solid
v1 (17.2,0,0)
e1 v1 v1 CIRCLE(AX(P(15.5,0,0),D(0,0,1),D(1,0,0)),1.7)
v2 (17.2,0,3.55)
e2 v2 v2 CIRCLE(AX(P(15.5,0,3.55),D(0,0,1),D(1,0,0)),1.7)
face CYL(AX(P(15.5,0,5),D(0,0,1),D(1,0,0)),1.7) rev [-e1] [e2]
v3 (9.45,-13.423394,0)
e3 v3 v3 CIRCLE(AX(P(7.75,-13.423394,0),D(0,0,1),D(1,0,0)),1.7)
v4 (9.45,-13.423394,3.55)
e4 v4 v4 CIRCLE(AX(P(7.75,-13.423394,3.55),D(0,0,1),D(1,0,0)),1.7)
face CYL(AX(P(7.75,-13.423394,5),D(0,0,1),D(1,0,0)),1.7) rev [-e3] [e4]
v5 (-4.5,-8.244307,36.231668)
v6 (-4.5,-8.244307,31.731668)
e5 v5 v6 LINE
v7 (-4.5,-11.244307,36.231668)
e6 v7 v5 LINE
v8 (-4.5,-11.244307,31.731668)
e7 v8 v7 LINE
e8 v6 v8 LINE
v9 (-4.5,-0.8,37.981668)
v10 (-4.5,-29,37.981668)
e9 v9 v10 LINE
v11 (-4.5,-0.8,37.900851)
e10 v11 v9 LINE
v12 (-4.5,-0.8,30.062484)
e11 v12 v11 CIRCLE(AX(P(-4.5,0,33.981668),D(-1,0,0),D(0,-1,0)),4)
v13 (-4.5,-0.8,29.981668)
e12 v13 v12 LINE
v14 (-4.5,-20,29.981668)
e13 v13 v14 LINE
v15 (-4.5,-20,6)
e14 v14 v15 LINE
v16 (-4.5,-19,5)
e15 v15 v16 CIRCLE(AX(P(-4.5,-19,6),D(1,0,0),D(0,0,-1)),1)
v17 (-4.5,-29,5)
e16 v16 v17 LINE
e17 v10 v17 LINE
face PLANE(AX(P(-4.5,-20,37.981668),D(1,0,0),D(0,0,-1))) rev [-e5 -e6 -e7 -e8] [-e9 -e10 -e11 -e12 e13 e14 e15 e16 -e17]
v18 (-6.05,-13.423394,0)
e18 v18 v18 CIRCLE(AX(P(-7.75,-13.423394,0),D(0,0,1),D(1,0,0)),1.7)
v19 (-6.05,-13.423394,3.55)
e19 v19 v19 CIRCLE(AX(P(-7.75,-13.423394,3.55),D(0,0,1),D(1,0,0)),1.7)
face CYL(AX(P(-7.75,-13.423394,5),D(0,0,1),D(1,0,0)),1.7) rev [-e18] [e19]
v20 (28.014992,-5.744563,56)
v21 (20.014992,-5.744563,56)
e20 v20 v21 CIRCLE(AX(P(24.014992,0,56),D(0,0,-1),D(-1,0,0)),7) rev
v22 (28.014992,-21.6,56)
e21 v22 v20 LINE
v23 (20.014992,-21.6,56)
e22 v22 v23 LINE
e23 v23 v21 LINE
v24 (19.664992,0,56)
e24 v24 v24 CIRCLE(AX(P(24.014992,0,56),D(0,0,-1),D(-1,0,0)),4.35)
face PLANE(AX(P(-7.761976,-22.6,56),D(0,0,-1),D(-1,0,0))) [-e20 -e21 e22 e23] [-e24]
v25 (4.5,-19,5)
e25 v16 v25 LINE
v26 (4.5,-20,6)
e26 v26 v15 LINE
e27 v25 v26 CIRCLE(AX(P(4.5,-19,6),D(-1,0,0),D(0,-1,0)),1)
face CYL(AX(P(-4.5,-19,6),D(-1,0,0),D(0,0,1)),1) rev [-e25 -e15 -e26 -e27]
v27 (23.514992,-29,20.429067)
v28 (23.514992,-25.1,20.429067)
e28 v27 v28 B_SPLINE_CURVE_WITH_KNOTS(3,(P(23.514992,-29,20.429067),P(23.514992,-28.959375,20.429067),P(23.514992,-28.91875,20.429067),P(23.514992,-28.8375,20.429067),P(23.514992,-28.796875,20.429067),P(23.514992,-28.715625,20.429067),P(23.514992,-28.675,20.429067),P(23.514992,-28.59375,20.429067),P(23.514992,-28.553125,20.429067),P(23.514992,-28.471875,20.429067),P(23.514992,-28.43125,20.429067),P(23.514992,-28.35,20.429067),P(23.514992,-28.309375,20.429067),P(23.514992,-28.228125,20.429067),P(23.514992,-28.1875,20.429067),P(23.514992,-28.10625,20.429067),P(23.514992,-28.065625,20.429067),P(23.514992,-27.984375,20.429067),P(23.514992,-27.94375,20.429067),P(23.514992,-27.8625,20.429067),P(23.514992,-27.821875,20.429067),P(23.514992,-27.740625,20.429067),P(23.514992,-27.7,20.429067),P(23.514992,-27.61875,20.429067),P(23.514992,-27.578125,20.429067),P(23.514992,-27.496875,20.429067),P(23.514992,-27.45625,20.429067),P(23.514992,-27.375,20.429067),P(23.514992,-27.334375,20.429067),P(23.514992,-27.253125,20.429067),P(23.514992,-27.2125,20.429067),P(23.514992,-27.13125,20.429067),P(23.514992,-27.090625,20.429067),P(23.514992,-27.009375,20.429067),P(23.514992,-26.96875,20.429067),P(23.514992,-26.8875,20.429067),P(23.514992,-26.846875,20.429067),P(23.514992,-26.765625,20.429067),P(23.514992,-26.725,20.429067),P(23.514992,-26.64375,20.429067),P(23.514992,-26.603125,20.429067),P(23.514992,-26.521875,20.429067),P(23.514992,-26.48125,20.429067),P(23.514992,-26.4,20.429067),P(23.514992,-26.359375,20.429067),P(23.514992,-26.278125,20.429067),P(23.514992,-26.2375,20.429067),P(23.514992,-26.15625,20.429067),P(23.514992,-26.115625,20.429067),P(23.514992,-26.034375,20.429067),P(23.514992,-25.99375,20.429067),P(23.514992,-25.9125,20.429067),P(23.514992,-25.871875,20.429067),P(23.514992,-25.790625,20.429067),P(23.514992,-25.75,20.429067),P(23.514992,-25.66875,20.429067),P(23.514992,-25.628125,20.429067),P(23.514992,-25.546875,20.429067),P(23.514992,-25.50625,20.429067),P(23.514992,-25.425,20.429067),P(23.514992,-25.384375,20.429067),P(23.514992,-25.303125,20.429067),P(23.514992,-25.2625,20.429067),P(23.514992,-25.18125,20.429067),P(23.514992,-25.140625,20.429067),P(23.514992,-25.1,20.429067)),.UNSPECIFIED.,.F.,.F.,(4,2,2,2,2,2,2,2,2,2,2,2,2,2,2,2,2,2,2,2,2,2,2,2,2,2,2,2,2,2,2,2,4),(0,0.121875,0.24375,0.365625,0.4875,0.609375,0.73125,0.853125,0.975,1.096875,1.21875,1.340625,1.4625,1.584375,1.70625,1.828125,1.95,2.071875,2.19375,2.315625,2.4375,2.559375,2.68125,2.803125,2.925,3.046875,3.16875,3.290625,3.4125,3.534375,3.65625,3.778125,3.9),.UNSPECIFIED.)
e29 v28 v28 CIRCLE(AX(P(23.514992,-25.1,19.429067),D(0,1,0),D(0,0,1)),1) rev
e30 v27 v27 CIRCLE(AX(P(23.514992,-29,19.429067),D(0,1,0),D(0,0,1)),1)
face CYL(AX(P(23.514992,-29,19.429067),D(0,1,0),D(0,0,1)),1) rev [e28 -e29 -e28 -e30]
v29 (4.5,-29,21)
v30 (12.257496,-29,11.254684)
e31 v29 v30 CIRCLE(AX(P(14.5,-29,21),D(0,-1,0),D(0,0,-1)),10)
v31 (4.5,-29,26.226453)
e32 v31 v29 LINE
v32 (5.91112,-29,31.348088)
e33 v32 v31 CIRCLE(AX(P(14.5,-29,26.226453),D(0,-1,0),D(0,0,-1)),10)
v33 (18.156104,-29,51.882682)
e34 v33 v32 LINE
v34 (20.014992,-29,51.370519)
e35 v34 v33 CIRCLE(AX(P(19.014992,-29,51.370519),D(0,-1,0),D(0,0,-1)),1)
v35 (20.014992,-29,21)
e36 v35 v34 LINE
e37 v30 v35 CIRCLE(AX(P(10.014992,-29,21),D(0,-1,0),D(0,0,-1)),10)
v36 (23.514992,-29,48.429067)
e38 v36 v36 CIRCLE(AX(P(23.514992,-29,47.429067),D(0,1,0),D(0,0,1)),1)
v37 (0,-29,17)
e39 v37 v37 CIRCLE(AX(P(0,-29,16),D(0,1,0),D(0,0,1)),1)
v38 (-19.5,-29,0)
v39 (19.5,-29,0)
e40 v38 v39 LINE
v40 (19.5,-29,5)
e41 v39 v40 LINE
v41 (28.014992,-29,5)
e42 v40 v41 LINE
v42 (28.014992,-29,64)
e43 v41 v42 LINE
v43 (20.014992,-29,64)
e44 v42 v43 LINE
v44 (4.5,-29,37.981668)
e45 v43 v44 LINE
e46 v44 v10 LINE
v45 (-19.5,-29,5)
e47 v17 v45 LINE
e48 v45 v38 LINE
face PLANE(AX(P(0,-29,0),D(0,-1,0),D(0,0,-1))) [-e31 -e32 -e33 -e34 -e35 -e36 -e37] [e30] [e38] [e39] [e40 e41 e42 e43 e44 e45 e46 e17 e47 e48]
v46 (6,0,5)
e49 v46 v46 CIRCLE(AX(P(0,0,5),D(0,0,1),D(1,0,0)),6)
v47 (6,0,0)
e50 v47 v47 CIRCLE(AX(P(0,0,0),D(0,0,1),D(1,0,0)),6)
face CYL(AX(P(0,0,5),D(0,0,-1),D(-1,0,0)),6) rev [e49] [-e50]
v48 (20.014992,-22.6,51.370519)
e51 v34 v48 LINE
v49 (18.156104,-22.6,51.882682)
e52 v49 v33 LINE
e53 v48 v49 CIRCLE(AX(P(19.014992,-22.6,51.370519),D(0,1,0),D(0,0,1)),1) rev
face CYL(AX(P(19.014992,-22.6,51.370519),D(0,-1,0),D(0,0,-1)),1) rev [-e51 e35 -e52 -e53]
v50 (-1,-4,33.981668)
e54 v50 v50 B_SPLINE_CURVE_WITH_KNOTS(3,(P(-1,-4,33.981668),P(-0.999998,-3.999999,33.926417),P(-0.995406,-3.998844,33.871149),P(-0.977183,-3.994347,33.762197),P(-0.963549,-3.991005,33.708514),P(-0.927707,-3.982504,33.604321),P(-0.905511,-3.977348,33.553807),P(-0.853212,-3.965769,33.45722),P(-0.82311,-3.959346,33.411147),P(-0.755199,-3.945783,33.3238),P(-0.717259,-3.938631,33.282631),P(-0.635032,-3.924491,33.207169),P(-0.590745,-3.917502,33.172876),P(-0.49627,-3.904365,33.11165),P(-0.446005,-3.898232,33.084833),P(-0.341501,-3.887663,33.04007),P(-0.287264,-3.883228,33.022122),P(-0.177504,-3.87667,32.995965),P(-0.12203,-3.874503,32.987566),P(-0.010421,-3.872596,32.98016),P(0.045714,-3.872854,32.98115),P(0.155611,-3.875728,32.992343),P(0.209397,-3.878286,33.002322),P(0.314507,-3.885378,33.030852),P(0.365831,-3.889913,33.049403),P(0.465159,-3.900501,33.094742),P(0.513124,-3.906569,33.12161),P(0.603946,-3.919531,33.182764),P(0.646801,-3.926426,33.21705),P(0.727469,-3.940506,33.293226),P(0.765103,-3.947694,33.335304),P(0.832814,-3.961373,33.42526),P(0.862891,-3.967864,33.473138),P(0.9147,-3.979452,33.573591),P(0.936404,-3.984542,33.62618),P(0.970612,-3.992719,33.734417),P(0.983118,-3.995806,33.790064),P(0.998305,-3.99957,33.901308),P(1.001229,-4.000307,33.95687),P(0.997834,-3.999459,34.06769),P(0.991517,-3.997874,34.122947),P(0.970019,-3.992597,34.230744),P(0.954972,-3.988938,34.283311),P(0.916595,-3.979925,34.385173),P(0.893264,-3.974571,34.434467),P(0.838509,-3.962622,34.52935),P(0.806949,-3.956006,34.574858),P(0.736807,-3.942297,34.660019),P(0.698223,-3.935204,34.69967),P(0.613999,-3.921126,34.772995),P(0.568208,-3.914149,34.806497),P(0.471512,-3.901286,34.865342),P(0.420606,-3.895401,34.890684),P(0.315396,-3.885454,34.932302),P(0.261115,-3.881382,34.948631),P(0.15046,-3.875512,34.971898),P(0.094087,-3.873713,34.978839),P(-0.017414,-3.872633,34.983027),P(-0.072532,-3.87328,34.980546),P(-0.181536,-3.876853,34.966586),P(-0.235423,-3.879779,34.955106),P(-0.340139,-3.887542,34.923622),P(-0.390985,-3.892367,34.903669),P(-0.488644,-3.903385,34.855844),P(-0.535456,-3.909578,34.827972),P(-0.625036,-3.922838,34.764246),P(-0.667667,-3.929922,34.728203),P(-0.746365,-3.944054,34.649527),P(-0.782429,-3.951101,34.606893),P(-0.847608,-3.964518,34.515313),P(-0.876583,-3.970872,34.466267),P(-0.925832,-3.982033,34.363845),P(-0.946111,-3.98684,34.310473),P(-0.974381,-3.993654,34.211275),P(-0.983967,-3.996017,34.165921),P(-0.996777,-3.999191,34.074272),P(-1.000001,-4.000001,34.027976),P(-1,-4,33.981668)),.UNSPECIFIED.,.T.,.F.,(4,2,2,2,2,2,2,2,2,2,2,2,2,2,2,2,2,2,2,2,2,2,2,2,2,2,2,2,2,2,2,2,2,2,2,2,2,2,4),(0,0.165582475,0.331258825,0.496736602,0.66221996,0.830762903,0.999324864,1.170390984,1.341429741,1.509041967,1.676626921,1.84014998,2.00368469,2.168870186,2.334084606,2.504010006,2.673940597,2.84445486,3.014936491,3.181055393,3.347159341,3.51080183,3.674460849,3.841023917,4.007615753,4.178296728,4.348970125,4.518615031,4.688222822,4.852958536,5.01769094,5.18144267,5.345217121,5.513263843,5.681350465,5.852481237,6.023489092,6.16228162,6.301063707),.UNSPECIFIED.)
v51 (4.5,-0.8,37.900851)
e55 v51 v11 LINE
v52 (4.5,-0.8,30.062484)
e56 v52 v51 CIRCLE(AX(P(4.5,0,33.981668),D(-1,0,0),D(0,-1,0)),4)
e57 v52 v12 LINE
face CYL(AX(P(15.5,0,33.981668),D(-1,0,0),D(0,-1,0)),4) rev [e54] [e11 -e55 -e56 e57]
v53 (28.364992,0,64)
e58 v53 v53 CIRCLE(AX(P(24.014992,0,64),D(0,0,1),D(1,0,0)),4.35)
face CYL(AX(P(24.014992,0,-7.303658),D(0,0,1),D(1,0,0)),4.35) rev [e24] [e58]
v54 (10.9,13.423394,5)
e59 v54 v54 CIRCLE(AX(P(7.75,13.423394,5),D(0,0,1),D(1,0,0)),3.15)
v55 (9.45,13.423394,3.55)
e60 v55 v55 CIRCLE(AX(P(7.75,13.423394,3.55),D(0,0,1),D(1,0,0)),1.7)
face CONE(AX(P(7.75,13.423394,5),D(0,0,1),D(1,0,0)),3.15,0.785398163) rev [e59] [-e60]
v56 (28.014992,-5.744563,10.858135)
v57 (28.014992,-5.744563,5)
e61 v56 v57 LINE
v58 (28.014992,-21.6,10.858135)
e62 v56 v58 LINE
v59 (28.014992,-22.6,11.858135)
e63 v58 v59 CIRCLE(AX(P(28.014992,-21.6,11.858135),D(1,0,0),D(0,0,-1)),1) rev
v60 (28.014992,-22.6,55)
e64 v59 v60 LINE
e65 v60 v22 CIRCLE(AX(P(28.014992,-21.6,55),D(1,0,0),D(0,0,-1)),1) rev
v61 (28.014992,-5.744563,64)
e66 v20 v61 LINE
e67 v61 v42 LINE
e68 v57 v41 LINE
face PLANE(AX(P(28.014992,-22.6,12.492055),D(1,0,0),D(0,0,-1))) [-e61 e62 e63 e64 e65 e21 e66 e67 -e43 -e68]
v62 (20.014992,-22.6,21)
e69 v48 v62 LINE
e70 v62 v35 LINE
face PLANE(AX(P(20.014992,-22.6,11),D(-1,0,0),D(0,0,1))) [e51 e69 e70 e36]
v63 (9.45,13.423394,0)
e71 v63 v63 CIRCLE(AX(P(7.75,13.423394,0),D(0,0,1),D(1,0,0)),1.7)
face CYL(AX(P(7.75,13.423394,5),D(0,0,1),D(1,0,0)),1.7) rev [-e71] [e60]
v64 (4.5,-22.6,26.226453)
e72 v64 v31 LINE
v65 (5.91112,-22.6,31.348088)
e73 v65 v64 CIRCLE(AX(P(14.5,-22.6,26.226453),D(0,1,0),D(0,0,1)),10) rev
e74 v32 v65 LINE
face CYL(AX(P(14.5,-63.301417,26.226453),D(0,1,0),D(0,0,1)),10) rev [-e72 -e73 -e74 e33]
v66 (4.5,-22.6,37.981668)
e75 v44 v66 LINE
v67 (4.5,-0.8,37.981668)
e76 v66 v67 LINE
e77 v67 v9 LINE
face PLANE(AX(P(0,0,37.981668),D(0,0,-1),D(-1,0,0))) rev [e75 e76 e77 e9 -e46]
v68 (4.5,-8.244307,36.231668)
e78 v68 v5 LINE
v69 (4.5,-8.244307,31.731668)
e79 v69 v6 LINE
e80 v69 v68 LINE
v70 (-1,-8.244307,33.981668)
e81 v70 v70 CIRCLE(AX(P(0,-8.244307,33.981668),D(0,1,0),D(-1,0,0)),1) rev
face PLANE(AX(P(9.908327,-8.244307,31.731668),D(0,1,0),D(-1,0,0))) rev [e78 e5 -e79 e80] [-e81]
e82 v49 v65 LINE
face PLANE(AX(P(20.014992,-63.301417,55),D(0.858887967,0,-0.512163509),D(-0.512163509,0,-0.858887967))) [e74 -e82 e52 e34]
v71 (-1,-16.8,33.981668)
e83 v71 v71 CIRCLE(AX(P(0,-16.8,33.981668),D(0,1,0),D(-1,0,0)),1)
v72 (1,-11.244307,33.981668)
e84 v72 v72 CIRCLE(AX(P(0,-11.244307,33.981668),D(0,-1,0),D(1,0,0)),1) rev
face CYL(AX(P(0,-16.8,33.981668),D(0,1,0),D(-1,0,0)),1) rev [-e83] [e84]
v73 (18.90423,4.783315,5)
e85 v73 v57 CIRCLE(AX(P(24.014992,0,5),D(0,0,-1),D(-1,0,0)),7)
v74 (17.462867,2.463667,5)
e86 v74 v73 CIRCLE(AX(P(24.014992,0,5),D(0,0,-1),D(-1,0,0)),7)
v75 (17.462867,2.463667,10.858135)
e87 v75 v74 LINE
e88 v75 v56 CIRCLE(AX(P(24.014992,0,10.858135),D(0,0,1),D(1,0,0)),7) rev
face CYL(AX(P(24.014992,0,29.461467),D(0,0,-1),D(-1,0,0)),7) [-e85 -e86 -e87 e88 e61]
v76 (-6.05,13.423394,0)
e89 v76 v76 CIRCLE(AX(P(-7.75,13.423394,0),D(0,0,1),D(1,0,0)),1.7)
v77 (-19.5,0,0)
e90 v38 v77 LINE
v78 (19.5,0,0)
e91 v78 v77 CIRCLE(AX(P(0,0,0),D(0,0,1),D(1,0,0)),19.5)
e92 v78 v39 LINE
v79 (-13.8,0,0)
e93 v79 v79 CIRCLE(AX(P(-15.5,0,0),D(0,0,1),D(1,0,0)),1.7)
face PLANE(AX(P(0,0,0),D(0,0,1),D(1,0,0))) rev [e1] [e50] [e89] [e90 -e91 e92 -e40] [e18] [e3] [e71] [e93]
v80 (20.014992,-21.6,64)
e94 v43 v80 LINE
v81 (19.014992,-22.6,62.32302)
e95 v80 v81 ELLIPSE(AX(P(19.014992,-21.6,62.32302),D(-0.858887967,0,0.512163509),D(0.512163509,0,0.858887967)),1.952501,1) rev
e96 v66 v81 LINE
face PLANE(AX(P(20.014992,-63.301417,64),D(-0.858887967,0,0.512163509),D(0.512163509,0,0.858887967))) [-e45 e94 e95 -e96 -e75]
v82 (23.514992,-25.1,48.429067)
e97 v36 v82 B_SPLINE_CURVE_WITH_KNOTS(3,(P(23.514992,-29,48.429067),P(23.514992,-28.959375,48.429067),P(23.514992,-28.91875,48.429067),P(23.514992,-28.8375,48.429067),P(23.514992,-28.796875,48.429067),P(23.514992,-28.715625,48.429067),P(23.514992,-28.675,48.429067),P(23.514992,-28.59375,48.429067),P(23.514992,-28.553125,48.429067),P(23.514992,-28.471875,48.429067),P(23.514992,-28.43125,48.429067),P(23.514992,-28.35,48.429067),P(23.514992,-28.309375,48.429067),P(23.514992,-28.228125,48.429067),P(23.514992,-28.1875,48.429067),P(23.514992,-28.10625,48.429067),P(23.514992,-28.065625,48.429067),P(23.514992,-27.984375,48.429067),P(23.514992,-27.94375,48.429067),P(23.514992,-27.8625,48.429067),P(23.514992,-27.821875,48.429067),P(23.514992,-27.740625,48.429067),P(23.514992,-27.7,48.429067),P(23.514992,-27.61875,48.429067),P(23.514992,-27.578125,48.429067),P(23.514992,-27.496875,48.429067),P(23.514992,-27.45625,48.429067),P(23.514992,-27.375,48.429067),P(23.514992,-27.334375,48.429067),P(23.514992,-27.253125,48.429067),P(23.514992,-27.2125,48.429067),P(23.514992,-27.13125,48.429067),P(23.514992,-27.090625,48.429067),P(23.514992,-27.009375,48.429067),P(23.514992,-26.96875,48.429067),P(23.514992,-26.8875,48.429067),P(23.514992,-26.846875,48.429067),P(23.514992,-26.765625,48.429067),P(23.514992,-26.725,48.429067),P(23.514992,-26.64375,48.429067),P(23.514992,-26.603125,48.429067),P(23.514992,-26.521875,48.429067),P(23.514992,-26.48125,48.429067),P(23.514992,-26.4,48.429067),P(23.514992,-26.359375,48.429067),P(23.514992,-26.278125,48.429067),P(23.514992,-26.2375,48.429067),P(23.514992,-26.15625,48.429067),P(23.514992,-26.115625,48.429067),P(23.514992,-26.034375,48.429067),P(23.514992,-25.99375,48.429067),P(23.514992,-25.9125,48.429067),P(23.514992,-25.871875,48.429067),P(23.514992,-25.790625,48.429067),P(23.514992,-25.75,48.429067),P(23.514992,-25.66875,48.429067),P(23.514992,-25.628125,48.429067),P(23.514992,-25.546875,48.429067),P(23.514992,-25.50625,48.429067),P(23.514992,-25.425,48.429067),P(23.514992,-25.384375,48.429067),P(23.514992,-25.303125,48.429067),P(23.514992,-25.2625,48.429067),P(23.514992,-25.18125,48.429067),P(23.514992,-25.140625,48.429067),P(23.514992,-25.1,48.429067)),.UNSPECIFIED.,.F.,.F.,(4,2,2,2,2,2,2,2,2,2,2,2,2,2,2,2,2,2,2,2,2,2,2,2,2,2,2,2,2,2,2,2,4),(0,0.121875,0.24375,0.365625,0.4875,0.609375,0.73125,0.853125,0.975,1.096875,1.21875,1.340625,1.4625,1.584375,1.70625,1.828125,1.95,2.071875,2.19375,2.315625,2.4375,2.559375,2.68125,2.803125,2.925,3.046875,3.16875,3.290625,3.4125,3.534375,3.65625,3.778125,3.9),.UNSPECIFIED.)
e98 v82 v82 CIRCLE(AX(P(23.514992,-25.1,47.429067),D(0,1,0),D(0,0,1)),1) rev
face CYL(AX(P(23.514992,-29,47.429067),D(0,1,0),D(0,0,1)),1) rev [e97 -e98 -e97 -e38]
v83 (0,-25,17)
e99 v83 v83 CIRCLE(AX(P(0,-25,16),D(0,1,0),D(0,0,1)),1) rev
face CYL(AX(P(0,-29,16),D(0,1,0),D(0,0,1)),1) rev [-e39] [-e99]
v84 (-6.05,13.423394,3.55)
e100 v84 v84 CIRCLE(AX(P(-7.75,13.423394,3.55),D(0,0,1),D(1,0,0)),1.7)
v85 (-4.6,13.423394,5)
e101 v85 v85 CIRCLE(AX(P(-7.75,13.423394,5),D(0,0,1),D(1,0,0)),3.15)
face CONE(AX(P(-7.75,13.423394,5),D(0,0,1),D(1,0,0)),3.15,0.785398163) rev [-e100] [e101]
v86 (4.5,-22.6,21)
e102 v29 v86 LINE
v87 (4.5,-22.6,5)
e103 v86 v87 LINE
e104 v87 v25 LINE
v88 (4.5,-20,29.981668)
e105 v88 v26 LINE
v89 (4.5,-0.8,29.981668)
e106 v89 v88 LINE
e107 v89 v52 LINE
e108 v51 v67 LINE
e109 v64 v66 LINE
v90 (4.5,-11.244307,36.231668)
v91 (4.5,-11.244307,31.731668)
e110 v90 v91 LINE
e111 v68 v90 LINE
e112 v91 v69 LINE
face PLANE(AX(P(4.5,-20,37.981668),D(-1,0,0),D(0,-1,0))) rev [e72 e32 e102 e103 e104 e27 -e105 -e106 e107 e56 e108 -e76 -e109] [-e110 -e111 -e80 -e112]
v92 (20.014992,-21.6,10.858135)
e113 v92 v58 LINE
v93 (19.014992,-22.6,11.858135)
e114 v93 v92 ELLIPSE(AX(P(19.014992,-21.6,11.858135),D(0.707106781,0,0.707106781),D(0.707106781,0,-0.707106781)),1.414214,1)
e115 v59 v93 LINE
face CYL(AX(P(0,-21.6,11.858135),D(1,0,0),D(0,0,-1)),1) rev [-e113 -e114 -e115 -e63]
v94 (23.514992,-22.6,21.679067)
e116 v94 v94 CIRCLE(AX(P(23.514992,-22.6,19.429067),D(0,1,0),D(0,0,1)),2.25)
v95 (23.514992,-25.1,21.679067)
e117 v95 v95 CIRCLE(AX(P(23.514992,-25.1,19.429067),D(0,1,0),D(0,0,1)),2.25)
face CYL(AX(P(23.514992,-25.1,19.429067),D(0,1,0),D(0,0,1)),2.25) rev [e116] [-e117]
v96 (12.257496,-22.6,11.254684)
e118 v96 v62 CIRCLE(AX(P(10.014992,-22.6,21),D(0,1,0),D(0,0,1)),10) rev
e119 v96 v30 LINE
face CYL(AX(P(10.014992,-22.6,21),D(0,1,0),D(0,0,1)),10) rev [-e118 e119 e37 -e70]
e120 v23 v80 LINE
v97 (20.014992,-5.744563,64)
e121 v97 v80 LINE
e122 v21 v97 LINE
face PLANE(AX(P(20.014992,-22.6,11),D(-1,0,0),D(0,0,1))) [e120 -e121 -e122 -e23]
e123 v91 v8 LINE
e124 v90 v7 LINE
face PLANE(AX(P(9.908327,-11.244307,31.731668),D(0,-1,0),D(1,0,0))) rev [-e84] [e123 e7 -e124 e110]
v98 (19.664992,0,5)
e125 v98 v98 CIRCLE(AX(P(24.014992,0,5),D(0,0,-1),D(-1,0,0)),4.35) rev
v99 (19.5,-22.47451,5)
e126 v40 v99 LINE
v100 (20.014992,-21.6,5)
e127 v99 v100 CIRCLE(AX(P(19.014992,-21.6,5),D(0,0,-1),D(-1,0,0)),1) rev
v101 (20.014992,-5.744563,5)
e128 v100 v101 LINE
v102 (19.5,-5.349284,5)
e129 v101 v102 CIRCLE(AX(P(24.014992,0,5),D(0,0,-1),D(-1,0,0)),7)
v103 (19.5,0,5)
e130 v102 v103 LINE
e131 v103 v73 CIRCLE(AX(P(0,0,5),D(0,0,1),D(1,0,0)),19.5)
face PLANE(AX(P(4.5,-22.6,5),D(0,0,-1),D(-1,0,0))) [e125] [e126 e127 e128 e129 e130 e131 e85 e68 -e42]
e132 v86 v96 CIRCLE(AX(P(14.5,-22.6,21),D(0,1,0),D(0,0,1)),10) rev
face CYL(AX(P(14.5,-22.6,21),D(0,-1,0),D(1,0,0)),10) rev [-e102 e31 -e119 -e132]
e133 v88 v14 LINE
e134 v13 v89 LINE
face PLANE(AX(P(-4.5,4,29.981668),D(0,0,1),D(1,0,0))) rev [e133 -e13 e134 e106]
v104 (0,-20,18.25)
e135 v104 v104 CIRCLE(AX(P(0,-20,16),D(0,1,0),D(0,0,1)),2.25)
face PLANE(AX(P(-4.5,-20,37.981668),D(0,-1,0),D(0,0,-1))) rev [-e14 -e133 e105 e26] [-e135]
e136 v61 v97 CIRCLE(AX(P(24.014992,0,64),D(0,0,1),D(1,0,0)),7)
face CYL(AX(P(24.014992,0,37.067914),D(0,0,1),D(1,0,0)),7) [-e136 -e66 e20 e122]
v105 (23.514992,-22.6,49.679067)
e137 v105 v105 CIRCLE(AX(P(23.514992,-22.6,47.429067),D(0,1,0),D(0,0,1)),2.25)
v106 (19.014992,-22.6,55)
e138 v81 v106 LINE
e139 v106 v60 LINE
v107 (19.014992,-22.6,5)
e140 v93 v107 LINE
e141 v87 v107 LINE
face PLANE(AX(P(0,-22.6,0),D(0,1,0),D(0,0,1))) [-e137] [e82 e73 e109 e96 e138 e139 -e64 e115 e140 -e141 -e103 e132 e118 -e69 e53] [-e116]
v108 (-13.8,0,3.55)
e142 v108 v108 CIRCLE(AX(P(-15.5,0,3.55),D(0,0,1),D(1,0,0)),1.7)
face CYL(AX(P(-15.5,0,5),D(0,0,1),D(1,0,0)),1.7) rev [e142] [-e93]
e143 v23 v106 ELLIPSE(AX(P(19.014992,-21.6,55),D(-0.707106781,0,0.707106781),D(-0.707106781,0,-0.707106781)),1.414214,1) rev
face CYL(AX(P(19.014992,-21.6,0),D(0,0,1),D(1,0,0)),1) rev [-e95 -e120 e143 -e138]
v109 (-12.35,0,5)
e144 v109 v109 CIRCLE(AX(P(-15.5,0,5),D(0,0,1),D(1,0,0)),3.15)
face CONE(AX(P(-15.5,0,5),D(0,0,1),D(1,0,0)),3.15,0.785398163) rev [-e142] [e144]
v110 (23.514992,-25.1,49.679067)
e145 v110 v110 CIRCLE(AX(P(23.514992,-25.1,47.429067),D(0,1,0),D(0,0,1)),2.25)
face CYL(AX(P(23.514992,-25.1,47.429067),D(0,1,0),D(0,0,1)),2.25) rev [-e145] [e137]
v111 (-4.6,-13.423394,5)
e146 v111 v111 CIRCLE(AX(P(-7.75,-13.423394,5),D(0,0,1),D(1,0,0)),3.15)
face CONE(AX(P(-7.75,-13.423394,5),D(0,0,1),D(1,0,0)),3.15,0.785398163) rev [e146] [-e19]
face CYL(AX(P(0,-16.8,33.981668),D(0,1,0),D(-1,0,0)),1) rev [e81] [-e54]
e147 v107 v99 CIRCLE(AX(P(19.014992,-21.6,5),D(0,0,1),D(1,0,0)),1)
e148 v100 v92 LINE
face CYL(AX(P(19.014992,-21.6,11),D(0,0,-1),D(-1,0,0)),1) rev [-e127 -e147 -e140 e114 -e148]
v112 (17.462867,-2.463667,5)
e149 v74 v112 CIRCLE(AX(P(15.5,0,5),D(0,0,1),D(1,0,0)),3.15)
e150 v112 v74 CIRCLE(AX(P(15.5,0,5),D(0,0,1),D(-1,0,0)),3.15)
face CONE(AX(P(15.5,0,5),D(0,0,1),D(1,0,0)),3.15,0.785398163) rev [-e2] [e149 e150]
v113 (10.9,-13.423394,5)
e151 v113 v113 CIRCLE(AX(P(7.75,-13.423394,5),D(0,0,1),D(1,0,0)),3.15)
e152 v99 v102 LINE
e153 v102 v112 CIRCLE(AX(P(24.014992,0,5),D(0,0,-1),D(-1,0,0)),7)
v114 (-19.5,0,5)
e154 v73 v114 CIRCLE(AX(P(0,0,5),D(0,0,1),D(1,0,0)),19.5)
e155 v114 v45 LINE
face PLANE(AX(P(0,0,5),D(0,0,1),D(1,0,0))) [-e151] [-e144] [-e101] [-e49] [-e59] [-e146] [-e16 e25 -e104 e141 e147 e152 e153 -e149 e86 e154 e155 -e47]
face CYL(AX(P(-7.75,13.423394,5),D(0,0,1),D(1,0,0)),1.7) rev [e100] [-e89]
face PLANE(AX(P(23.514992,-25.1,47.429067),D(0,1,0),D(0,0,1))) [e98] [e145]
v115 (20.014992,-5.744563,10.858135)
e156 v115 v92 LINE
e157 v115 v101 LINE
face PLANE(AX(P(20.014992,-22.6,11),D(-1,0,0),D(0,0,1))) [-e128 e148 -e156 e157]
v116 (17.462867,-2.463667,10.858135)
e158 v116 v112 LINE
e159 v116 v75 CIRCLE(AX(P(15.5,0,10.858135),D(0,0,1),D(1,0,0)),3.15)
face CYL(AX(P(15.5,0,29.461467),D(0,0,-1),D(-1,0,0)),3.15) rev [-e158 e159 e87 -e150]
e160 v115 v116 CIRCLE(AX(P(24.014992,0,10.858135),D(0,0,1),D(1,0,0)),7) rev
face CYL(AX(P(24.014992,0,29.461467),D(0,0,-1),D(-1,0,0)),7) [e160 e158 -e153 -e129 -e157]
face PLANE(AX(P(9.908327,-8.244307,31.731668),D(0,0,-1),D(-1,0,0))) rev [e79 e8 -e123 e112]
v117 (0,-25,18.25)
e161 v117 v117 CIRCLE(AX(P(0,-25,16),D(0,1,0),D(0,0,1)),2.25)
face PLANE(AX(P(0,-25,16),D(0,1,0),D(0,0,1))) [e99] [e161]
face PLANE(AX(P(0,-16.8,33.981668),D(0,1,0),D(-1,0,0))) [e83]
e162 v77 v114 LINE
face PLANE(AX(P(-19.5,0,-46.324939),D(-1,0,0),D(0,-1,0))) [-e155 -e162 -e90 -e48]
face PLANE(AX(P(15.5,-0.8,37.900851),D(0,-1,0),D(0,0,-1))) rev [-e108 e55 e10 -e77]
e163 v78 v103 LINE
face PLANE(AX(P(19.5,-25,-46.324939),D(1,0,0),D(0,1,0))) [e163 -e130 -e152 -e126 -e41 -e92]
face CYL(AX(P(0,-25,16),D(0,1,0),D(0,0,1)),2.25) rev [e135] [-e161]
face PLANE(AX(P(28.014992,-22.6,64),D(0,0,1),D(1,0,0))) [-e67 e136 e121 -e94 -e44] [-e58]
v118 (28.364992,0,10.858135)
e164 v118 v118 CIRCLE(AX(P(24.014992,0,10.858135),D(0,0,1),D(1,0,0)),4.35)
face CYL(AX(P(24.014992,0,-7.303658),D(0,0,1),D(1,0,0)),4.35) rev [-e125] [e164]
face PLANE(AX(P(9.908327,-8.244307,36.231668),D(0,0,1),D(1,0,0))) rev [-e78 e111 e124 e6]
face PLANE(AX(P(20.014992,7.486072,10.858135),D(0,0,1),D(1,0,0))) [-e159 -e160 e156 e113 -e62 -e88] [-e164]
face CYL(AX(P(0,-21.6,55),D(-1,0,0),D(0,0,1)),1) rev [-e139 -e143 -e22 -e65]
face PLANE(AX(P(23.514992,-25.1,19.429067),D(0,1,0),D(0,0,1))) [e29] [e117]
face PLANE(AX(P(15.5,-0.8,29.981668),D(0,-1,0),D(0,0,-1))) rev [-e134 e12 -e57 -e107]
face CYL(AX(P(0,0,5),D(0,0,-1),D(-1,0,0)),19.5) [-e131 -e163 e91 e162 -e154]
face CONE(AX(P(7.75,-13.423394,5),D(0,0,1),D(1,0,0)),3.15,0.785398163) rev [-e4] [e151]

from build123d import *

# Parameters (mm, degrees)
SKETCH5_R                                       = 19.5
SKETCH5_R_2                                     = 1.5
SKETCH5_R_3                                     = 6
BOSS_EXTRUDE1_DEPTH                             = 5
CSK_FOR_M3_FLAT_HEAD_MACHINE_SCREW1_D           = 3.4
CSK_FOR_M3_FLAT_HEAD_MACHINE_SCREW1_CSINK_D     = 6.3
CSK_FOR_M3_FLAT_HEAD_MACHINE_SCREW1_CSINK_ANGLE = 90
BOSS_EXTRUDE2_START                             = -5
BOSS_EXTRUDE2_DEPTH                             = 5
SKETCH9_W                                       = 9
SKETCH9_H                                       = 5
BOSS_EXTRUDE3_DEPTH                             = 32.98166783
SKETCH10_W                                      = 9
SKETCH10_H                                      = 8
BOSS_EXTRUDE4_DEPTH                             = 24
CUT_EXTRUDE1_DEPTH                              = 20
SKETCH12_R                                      = 1
CUT_EXTRUDE2_DEPTH                              = 16
CUT_EXTRUDE3_START                              = -9
SKETCH13_W                                      = 4.5
SKETCH13_H                                      = 3
CUT_EXTRUDE3_DEPTH                              = 9
BOSS_EXTRUDE5_DEPTH                             = 2.4
SKETCH15_W                                      = 8
SKETCH15_H                                      = 26.6
BOSS_EXTRUDE6_DEPTH                             = 8
CUT_EXTRUDE4_REACH                              = 76.201
CUT_EXTRUDE5_REACH                              = 83.567
SKETCH17_W                                      = 8
SKETCH17_H                                      = 3
BOSS_EXTRUDE7_DEPTH                             = 2.4
FILLET1_R                                       = 10
FILLET2_R                                       = 1
FILLET3_R                                       = 1
BOSS_EXTRUDE8_START                             = -5.858134929
BOSS_EXTRUDE8_DEPTH                             = 5.858134929
BOSS_EXTRUDE9_DEPTH                             = 8
CUT_EXTRUDE9_REACH                              = 77.385
SKETCH26_R                                      = 4.35
BOSS_EXTRUDE10_START                            = 4
BOSS_EXTRUDE10_DEPTH                            = 4
SKETCH28_R                                      = 1
CUT_EXTRUDE10_DEPTH                             = 83.645869552
SKETCH29_R                                      = 2.25
CUT_EXTRUDE11_DEPTH                             = 2.5
SKETCH30_R                                      = 1
CUT_EXTRUDE12_DEPTH                             = 82.352195754
SKETCH31_R                                      = 2.25
CUT_EXTRUDE13_DEPTH                             = 5


with BuildPart() as part:
    # Sketch5 → Boss-Extrude1 (new body)
    with BuildSketch(Plane.XY):
        Circle(SKETCH5_R)
        with Locations((-7.75, 13.423393759)):
            Circle(SKETCH5_R_2, mode=Mode.SUBTRACT)
        Circle(SKETCH5_R_3, mode=Mode.SUBTRACT)
        with Locations((7.75, 13.423393759)):
            Circle(SKETCH5_R_2, mode=Mode.SUBTRACT)
        with Locations((15.5, 0)):
            Circle(SKETCH5_R_2, mode=Mode.SUBTRACT)
        with Locations((7.75, -13.423393759)):
            Circle(SKETCH5_R_2, mode=Mode.SUBTRACT)
        with Locations((-7.75, -13.423393759)):
            Circle(SKETCH5_R_2, mode=Mode.SUBTRACT)
        with Locations((-15.5, 0)):
            Circle(SKETCH5_R_2, mode=Mode.SUBTRACT)
    extrude(amount=BOSS_EXTRUDE1_DEPTH)

    # CSK for M3 Flat Head Machine Screw1 (through all)
    with Locations(Plane.XY.offset(5)):
        with Locations((-15.5, 0), (-7.75, 13.423393759), (7.75, 13.423393759), (15.5, 0), (7.75, -13.423393759), (-7.75, -13.423393759)):
            CounterSinkHole(CSK_FOR_M3_FLAT_HEAD_MACHINE_SCREW1_D / 2, CSK_FOR_M3_FLAT_HEAD_MACHINE_SCREW1_CSINK_D / 2, counter_sink_angle=CSK_FOR_M3_FLAT_HEAD_MACHINE_SCREW1_CSINK_ANGLE)

    # Sketch8 → Boss-Extrude2 (add)
    with BuildSketch(Plane.XY.offset(5).offset(BOSS_EXTRUDE2_START)):
        with BuildLine():
            Line((-19.5, 0), (-19.5, -25))
            Line((-19.5, -25), (19.5, -25))
            Line((19.5, -25), (19.5, 0))
            ThreePointArc((19.5, 0), (0, -19.5), (-19.5, 0))
        make_face()
    extrude(amount=BOSS_EXTRUDE2_DEPTH)

    # Sketch9 → Boss-Extrude3 (add)
    with BuildSketch(Plane.XY.offset(5)):
        with Locations((0, -22.5)):
            Rectangle(SKETCH9_W, SKETCH9_H)
    extrude(amount=BOSS_EXTRUDE3_DEPTH)

    # Sketch10 → Boss-Extrude4 (add)
    with BuildSketch(Plane(origin=(0.371235249, -20, 0), x_dir=(1, 0, 0), z_dir=(0, 1, 0))):
        with Locations((-0.371235249, -33.98166783)):
            Rectangle(SKETCH10_W, SKETCH10_H)
    extrude(amount=BOSS_EXTRUDE4_DEPTH)

    # Sketch11 → Cut-Extrude1 (cut)
    with BuildSketch(Plane.ZY.offset(4.5)):
        with BuildLine():
            Line((29.98166783, 0), (27.136883472, 2.082164772))
            Line((27.136883472, 2.082164772), (27.357366889, 4.848229459))
            Line((27.357366889, 4.848229459), (32.749188635, 5.469591817))
            Line((32.749188635, 5.469591817), (41.448261638, 5.028624983))
            Line((41.448261638, 5.028624983), (40.823718291, 2.383004911))
            Line((40.823718291, 2.383004911), (37.98166783, 0))
            Line((37.98166783, 0), (37.98166783, -0.8))
            Line((37.98166783, -0.8), (37.900851418, -0.8))
            ThreePointArc((37.900851418, -0.8), (33.98166783, -4), (30.062484242, -0.8))
            Line((30.062484242, -0.8), (29.98166783, -0.8))
            Line((29.98166783, -0.8), (29.98166783, 0))
        make_face()
    extrude(amount=-CUT_EXTRUDE1_DEPTH, mode=Mode.SUBTRACT)

    # Sketch12 → Cut-Extrude2 (cut)
    with BuildSketch(Plane(origin=(0, -0.8, 0), x_dir=(1, 0, 0), z_dir=(0, 1, 0))):
        with Locations(Location((0, -33.98166783, 0), (0, 0, 180))):
            Circle(SKETCH12_R)
    extrude(amount=-CUT_EXTRUDE2_DEPTH, mode=Mode.SUBTRACT)

    # Sketch13 → Cut-Extrude3 (cut)
    with BuildSketch(Plane.ZY.offset(4.5).offset(CUT_EXTRUDE3_START)):
        with Locations((33.98166783, -9.74430731)):
            Rectangle(SKETCH13_W, SKETCH13_H)
    extrude(amount=CUT_EXTRUDE3_DEPTH, mode=Mode.SUBTRACT)

    # Sketch14 → Boss-Extrude5 (add)
    with BuildSketch(Plane.XZ.offset(25)):
        Polygon((4.5, 5), (28.014992407, 5), (28.014992407, 12.492055485), (28.014992407, 64), (20.014992407, 64), (20.014992407, 11), (4.5, 11), align=None)
    extrude(amount=-BOSS_EXTRUDE5_DEPTH)

    # Sketch15 → Boss-Extrude6 (add)
    with BuildSketch(Plane(origin=(28.014992407, 0, 0), x_dir=(0, 0, -1), z_dir=(1, 0, 0))):
        with Locations((-60, -9.3)):
            Rectangle(SKETCH15_W, SKETCH15_H)
        with Locations((-9, -9.3)):
            Rectangle(SKETCH15_W, SKETCH15_H)
    extrude(amount=-BOSS_EXTRUDE6_DEPTH)

    # Cut-Extrude4: up to this face of the body (flat: up to its plane)
    cut_extrude4_end = Plane(part.part.faces().sort_by_distance((23.992430761, -10.570480367, 5))[0])
    # Sketch16 → Cut-Extrude4 (cut, up to the picked face)
    with BuildSketch(Plane.XY.offset(64), mode=Mode.PRIVATE) as cut_extrude4_sk1:
        with BuildLine():
            Line((20.014992407, -1.0579315), (20.157430879, -1.0579315))
            ThreePointArc((20.157430879, -1.0579315), (24.014992407, -4), (27.872553935, -1.0579315))
            Line((27.872553935, -1.0579315), (28.014992407, -1.0579315))
            Line((28.014992407, -1.0579315), (30.979685938, 0.908889408))
            Line((30.979685938, 0.908889408), (30.041869507, 7.8055779))
            Line((30.041869507, 7.8055779), (20.014992407, 9.247594016))
            Line((20.014992407, 9.247594016), (20.014992407, -1.0579315))
        make_face()
    cut_extrude4_tool1 = split(extrude(cut_extrude4_sk1.sketch, amount=-CUT_EXTRUDE4_REACH, mode=Mode.PRIVATE), bisect_by=cut_extrude4_end, keep=Keep.BOTH, mode=Mode.PRIVATE)
    add(cut_extrude4_tool1.solids().sort_by(Axis((24.887523, 2.893806, 64), (0, 0, -1)))[0], mode=Mode.SUBTRACT)

    # Cut-Extrude5: up to this face of the body (flat: up to its plane)
    cut_extrude5_end = Plane(part.part.faces().sort_by_distance((20.086211643, -1.0579315, 9))[0])
    # Sketch17 → Cut-Extrude5 (cut, up to the picked face)
    with BuildSketch(Plane(origin=(0, -22.6, 0), x_dir=(1, 0, 0), z_dir=(0, 1, 0)), mode=Mode.PRIVATE) as cut_extrude5_sk1:
        with Locations((24.014992407, -12.358134929)):
            Rectangle(SKETCH17_W, SKETCH17_H)
    cut_extrude5_tool1 = split(extrude(cut_extrude5_sk1.sketch, amount=CUT_EXTRUDE5_REACH, mode=Mode.PRIVATE), bisect_by=cut_extrude5_end, keep=Keep.BOTH, mode=Mode.PRIVATE)
    add(cut_extrude5_tool1.solids().sort_by(Axis((24.014992, -22.6, 12.358135), (0, 1, 0)))[0], mode=Mode.SUBTRACT)

    # Sketch20 → Boss-Extrude7 (add)
    with BuildSketch(Plane(origin=(0, -22.6, 0), x_dir=(1, 0, 0), z_dir=(0, 1, 0))):
        Polygon((20.014992407, -64), (4.5, -37.98166783), (4.5, -28.98166783), (20.014992407, -55), align=None)
    extrude(amount=-BOSS_EXTRUDE7_DEPTH)

    # Fillet1
    # the kernel refuses this fillet: 10 mm, written as the material it adds along each edge
    with BuildSketch(Plane(origin=(4.5, -25, 11), x_dir=(0, 0, 1), z_dir=(0, 1, 0)), Plane(origin=(20.014992407, -25, 11), x_dir=(-1, 0, 0), z_dir=(0, 1, 0))) as fillet1_piece_1:
        with BuildLine():
            CenterArc((FILLET1_R, FILLET1_R), FILLET1_R, 180, 90)
            Line((0, FILLET1_R), (0, 0))
            Line((0, 0), (FILLET1_R, 0))
        make_face()
    extrude(amount=2.4)
    with BuildSketch(Plane(origin=(4.5, -22.6, 28.98166783), x_dir=(0, 0, -1), z_dir=(0, -1, 0))) as fillet1_piece_2:
        with BuildLine():
            CenterArc((FILLET1_R * 0.275521450238, FILLET1_R), FILLET1_R, 239.191952284, 30.808047716)
            Line((-FILLET1_R * 0.236642058357, FILLET1_R * 0.141112032647), (0, 0))
            Line((0, 0), (FILLET1_R * 0.275521450238, 0))
        make_face()
    extrude(amount=2.4)

    # Fillet2
    fillet2_edges = [part.edges().sort_by_distance(p)[0] for p in [
        (20.014992407, -23.8, 55),
    ]]
    fillet(fillet2_edges, radius=FILLET2_R)

    # Fillet3
    # the kernel refuses this fillet: 1 mm, written as the material it adds along each edge
    with BuildSketch(Plane(origin=(28.014992407, -22.6, 56), x_dir=(0, 0, -1), z_dir=(-1, 0, 0))) as fillet3_piece_1:
        with BuildLine():
            CenterArc((FILLET3_R, -FILLET3_R), FILLET3_R, 90, 90)
            Line((0, -FILLET3_R), (0, 0))
            Line((0, 0), (FILLET3_R, 0))
        make_face()
    extrude(amount=8)
    with BuildSketch(Plane(origin=(20.014992407, -22.6, 5), x_dir=(-1, 0, 0), z_dir=(0, 0, 1))) as fillet3_piece_2:
        with BuildLine():
            CenterArc((FILLET3_R, -FILLET3_R), FILLET3_R, 90, 90)
            Line((0, -FILLET3_R), (0, 0))
            Line((0, 0), (FILLET3_R, 0))
        make_face()
    extrude(amount=5.858134929)
    with BuildSketch(Plane(origin=(28.014992407, -22.6, 10.858134929), x_dir=(0, 0, 1), z_dir=(-1, 0, 0))) as fillet3_piece_3:
        with BuildLine():
            CenterArc((FILLET3_R, FILLET3_R), FILLET3_R, 180, 90)
            Line((0, FILLET3_R), (0, 0))
            Line((0, 0), (FILLET3_R, 0))
        make_face()
    extrude(amount=8)
    with BuildSketch(Plane(origin=(20.014992407, -22.6, 56), x_dir=(-1, 0, 0), z_dir=(0, 0, 1))) as fillet3_piece_4_section:
        with BuildLine():
            CenterArc((FILLET3_R, -FILLET3_R), FILLET3_R, 90, 90)
            Line((0, -FILLET3_R), (0, 0))
            Line((0, 0), (FILLET3_R, 0))
        make_face()
    fillet3_piece_4 = extrude(amount=8, mode=Mode.PRIVATE)
    fillet3_piece_4 = split(fillet3_piece_4, bisect_by=Plane(origin=(18.118657623, -22.367607941, 60.81988447), z_dir=(0.8588879673530325, 0, -0.5121635085948395)), keep=Keep.TOP, mode=Mode.PRIVATE)
    add(fillet3_piece_4)
    with BuildSketch(Plane(origin=(4.5, -20, 5), x_dir=(0, 1, 0), z_dir=(-1, 0, 0))) as fillet3_piece_5:
        with BuildLine():
            CenterArc((FILLET3_R, -FILLET3_R), FILLET3_R, 90, 90)
            Line((0, -FILLET3_R), (0, 0))
            Line((0, 0), (FILLET3_R, 0))
        make_face()
    extrude(amount=9)
    with BuildSketch(Plane(origin=(20.014992407, -22.6, 53.5), x_dir=(-1, 0, 0), z_dir=(0, 0, 1))) as fillet3_piece_6a_section:
        with BuildLine():
            CenterArc((FILLET3_R, -FILLET3_R), FILLET3_R, 90, 90)
            Line((0, -FILLET3_R), (0, 0))
            Line((0, 0), (FILLET3_R, 0))
        make_face()
    fillet3_piece_6a = extrude(amount=10.5, mode=Mode.PRIVATE)
    fillet3_piece_6a = split(fillet3_piece_6a, bisect_by=Plane(origin=(19.788597293, -22.373604886, 56), z_dir=(0, 0, -1)), keep=Keep.TOP, mode=Mode.PRIVATE)
    with BuildSketch(Plane(origin=(28.014992407, -22.6, 56), x_dir=(0, 0, -1), z_dir=(-1, 0, 0))) as fillet3_piece_6b_section:
        with BuildLine():
            CenterArc((FILLET3_R, -FILLET3_R), FILLET3_R, 90, 90)
            Line((0, -FILLET3_R), (0, 0))
            Line((0, 0), (FILLET3_R, 0))
        make_face()
    fillet3_piece_6b = extrude(amount=10.5, mode=Mode.PRIVATE)
    fillet3_piece_6b = split(fillet3_piece_6b, bisect_by=Plane(origin=(20.014992407, -22.373604886, 55.773604886), z_dir=(-1, 0, 0)), keep=Keep.TOP, mode=Mode.PRIVATE)
    fillet3_piece_6 = fillet3_piece_6a & fillet3_piece_6b
    add(fillet3_piece_6)
    with BuildSketch(Plane(origin=(20.014992407, -22.6, 5), x_dir=(-1, 0, 0), z_dir=(0, 0, 1))) as fillet3_piece_7a_section:
        with BuildLine():
            CenterArc((FILLET3_R, -FILLET3_R), FILLET3_R, 90, 90)
            Line((0, -FILLET3_R), (0, 0))
            Line((0, 0), (FILLET3_R, 0))
        make_face()
    fillet3_piece_7a = extrude(amount=8.358134929, mode=Mode.PRIVATE)
    fillet3_piece_7a = split(fillet3_piece_7a, bisect_by=Plane(origin=(19.788597293, -22.373604886, 10.858134929), z_dir=(0, 0, 1)), keep=Keep.TOP, mode=Mode.PRIVATE)
    with BuildSketch(Plane(origin=(28.014992407, -22.6, 10.858134929), x_dir=(0, 0, 1), z_dir=(-1, 0, 0))) as fillet3_piece_7b_section:
        with BuildLine():
            CenterArc((FILLET3_R, FILLET3_R), FILLET3_R, 180, 90)
            Line((0, FILLET3_R), (0, 0))
            Line((0, 0), (FILLET3_R, 0))
        make_face()
    fillet3_piece_7b = extrude(amount=10.5, mode=Mode.PRIVATE)
    fillet3_piece_7b = split(fillet3_piece_7b, bisect_by=Plane(origin=(20.014992407, -22.373604886, 11.084530043), z_dir=(-1, 0, 0)), keep=Keep.TOP, mode=Mode.PRIVATE)
    fillet3_piece_7 = fillet3_piece_7a & fillet3_piece_7b
    add(fillet3_piece_7)

    # Sketch24 → Boss-Extrude8 (add)
    with BuildSketch(Plane(origin=(0, 0, 5), x_dir=(-1, 0, 0), z_dir=(0, 0, -1)).offset(BOSS_EXTRUDE8_START)):
        with BuildLine():
            Line((-20.014992407, -5.744562647), (-20.014992407, -1.0579315))
            Line((-20.014992407, -1.0579315), (-20.157430879, -1.0579315))
            ThreePointArc((-20.157430879, -1.0579315), (-24.014992407, 4), (-27.872553935, -1.0579315))
            Line((-27.872553935, -1.0579315), (-28.014992407, -1.0579315))
            Line((-28.014992407, -1.0579315), (-28.014992407, -5.744562647))
            ThreePointArc((-28.014992407, -5.744562647), (-28.312909665, 5.525206534), (-17.462867029, 2.463666582))
            ThreePointArc((-17.462867029, 2.463666582), (-18.65, 0), (-17.462867029, -2.463666582))
            ThreePointArc((-17.462867029, -2.463666582), (-18.489785873, -4.297917258), (-20.014992407, -5.744562647))
        make_face()
    extrude(amount=BOSS_EXTRUDE8_DEPTH)

    # Sketch25 → Boss-Extrude9 (add)
    with BuildSketch(Plane.XY.offset(64)):
        with BuildLine():
            Line((20.014992407, -5.744562647), (20.014992407, -1.0579315))
            Line((20.014992407, -1.0579315), (20.157430879, -1.0579315))
            ThreePointArc((20.157430879, -1.0579315), (24.014992407, 4), (27.872553935, -1.0579315))
            Line((27.872553935, -1.0579315), (28.014992407, -1.0579315))
            Line((28.014992407, -1.0579315), (28.014992407, -5.744562647))
            ThreePointArc((28.014992407, -5.744562647), (24.014992407, 7), (20.014992407, -5.744562647))
        make_face()
    extrude(amount=-BOSS_EXTRUDE9_DEPTH)

    # Cut-Extrude9: up to this face of the body (flat: up to its plane)
    cut_extrude9_end = Plane(part.part.faces().sort_by_distance((24.401043924, -10.02174873, 5))[0])
    # Sketch26 → Cut-Extrude9 (cut, up to the picked face)
    with BuildSketch(Plane.XY.offset(64), mode=Mode.PRIVATE) as cut_extrude9_sk1:
        with Locations((24.014992407, 0)):
            Circle(SKETCH26_R)
    cut_extrude9_tool1 = split(extrude(cut_extrude9_sk1.sketch, amount=-CUT_EXTRUDE9_REACH, mode=Mode.PRIVATE), bisect_by=cut_extrude9_end, keep=Keep.BOTH, mode=Mode.PRIVATE)
    add(cut_extrude9_tool1.solids().sort_by(Axis((24.014992, 0, 64), (0, 0, -1)))[0], mode=Mode.SUBTRACT)

    # Sketch27 → Boss-Extrude10 (add)
    with BuildSketch(Plane.XZ.offset(25).offset(BOSS_EXTRUDE10_START)):
        Polygon((19.5, 0), (19.5, 5), (28.014992407, 5), (28.014992407, 64), (20.014992407, 64), (4.5, 37.98166783), (-4.5, 37.98166783), (-4.5, 5), (-19.5, 5), (-19.5, 0), align=None)
        with BuildLine():
            Line((4.5, 26.226453328), (4.5, 21))
            ThreePointArc((4.5, 21), (6.67615702, 14.772040381), (12.257496204, 11.25468437))
            ThreePointArc((12.257496204, 11.25468437), (17.838835387, 14.772040381), (20.014992407, 21))
            Line((20.014992407, 21), (20.014992407, 51.370518524))
            ThreePointArc((20.014992407, 51.370518524), (19.280616232, 52.334595276), (18.15610444, 51.882682032))
            Line((18.15610444, 51.882682032), (5.911120326, 31.348088414))
            ThreePointArc((5.911120326, 31.348088414), (4.85923248, 28.882691576), (4.5, 26.226453328))
        make_face(mode=Mode.SUBTRACT)
    extrude(amount=-BOSS_EXTRUDE10_DEPTH)

    # Sketch28 → Cut-Extrude10 (cut, through all)
    with BuildSketch(Plane(origin=(0, -22.6, 0), x_dir=(1, 0, 0), z_dir=(0, 1, 0))):
        with Locations(Location((23.514992407, -19.429067464, 0), (0, 0, 270))):
            Circle(SKETCH28_R)
        with Locations(Location((23.514992407, -47.429067464, 0), (0, 0, 270))):
            Circle(SKETCH28_R)
    extrude(amount=-CUT_EXTRUDE10_DEPTH, mode=Mode.SUBTRACT)

    # Sketch29 → Cut-Extrude11 (cut)
    with BuildSketch(Plane(origin=(0, -22.6, 0), x_dir=(1, 0, 0), z_dir=(0, 1, 0))):
        with Locations(Location((23.514992407, -19.429067464, 0), (0, 0, 270))):
            Circle(SKETCH29_R)
        with Locations(Location((23.514992407, -47.429067464, 0), (0, 0, 270))):
            Circle(SKETCH29_R)
    extrude(amount=-CUT_EXTRUDE11_DEPTH, mode=Mode.SUBTRACT)

    # Sketch30 → Cut-Extrude12 (cut, through all)
    with BuildSketch(Plane(origin=(0, -20, 0), x_dir=(1, 0, 0), z_dir=(0, 1, 0))):
        with Locations(Location((0, -16, 0), (0, 0, 270))):
            Circle(SKETCH30_R)
    extrude(amount=-CUT_EXTRUDE12_DEPTH, mode=Mode.SUBTRACT)

    # Sketch31 → Cut-Extrude13 (cut)
    with BuildSketch(Plane(origin=(0, -20, 0), x_dir=(1, 0, 0), z_dir=(0, 1, 0))):
        with Locations(Location((0, -16, 0), (0, 0, 270))):
            Circle(SKETCH31_R)
    extrude(amount=-CUT_EXTRUDE13_DEPTH, mode=Mode.SUBTRACT)


solid = part.part
